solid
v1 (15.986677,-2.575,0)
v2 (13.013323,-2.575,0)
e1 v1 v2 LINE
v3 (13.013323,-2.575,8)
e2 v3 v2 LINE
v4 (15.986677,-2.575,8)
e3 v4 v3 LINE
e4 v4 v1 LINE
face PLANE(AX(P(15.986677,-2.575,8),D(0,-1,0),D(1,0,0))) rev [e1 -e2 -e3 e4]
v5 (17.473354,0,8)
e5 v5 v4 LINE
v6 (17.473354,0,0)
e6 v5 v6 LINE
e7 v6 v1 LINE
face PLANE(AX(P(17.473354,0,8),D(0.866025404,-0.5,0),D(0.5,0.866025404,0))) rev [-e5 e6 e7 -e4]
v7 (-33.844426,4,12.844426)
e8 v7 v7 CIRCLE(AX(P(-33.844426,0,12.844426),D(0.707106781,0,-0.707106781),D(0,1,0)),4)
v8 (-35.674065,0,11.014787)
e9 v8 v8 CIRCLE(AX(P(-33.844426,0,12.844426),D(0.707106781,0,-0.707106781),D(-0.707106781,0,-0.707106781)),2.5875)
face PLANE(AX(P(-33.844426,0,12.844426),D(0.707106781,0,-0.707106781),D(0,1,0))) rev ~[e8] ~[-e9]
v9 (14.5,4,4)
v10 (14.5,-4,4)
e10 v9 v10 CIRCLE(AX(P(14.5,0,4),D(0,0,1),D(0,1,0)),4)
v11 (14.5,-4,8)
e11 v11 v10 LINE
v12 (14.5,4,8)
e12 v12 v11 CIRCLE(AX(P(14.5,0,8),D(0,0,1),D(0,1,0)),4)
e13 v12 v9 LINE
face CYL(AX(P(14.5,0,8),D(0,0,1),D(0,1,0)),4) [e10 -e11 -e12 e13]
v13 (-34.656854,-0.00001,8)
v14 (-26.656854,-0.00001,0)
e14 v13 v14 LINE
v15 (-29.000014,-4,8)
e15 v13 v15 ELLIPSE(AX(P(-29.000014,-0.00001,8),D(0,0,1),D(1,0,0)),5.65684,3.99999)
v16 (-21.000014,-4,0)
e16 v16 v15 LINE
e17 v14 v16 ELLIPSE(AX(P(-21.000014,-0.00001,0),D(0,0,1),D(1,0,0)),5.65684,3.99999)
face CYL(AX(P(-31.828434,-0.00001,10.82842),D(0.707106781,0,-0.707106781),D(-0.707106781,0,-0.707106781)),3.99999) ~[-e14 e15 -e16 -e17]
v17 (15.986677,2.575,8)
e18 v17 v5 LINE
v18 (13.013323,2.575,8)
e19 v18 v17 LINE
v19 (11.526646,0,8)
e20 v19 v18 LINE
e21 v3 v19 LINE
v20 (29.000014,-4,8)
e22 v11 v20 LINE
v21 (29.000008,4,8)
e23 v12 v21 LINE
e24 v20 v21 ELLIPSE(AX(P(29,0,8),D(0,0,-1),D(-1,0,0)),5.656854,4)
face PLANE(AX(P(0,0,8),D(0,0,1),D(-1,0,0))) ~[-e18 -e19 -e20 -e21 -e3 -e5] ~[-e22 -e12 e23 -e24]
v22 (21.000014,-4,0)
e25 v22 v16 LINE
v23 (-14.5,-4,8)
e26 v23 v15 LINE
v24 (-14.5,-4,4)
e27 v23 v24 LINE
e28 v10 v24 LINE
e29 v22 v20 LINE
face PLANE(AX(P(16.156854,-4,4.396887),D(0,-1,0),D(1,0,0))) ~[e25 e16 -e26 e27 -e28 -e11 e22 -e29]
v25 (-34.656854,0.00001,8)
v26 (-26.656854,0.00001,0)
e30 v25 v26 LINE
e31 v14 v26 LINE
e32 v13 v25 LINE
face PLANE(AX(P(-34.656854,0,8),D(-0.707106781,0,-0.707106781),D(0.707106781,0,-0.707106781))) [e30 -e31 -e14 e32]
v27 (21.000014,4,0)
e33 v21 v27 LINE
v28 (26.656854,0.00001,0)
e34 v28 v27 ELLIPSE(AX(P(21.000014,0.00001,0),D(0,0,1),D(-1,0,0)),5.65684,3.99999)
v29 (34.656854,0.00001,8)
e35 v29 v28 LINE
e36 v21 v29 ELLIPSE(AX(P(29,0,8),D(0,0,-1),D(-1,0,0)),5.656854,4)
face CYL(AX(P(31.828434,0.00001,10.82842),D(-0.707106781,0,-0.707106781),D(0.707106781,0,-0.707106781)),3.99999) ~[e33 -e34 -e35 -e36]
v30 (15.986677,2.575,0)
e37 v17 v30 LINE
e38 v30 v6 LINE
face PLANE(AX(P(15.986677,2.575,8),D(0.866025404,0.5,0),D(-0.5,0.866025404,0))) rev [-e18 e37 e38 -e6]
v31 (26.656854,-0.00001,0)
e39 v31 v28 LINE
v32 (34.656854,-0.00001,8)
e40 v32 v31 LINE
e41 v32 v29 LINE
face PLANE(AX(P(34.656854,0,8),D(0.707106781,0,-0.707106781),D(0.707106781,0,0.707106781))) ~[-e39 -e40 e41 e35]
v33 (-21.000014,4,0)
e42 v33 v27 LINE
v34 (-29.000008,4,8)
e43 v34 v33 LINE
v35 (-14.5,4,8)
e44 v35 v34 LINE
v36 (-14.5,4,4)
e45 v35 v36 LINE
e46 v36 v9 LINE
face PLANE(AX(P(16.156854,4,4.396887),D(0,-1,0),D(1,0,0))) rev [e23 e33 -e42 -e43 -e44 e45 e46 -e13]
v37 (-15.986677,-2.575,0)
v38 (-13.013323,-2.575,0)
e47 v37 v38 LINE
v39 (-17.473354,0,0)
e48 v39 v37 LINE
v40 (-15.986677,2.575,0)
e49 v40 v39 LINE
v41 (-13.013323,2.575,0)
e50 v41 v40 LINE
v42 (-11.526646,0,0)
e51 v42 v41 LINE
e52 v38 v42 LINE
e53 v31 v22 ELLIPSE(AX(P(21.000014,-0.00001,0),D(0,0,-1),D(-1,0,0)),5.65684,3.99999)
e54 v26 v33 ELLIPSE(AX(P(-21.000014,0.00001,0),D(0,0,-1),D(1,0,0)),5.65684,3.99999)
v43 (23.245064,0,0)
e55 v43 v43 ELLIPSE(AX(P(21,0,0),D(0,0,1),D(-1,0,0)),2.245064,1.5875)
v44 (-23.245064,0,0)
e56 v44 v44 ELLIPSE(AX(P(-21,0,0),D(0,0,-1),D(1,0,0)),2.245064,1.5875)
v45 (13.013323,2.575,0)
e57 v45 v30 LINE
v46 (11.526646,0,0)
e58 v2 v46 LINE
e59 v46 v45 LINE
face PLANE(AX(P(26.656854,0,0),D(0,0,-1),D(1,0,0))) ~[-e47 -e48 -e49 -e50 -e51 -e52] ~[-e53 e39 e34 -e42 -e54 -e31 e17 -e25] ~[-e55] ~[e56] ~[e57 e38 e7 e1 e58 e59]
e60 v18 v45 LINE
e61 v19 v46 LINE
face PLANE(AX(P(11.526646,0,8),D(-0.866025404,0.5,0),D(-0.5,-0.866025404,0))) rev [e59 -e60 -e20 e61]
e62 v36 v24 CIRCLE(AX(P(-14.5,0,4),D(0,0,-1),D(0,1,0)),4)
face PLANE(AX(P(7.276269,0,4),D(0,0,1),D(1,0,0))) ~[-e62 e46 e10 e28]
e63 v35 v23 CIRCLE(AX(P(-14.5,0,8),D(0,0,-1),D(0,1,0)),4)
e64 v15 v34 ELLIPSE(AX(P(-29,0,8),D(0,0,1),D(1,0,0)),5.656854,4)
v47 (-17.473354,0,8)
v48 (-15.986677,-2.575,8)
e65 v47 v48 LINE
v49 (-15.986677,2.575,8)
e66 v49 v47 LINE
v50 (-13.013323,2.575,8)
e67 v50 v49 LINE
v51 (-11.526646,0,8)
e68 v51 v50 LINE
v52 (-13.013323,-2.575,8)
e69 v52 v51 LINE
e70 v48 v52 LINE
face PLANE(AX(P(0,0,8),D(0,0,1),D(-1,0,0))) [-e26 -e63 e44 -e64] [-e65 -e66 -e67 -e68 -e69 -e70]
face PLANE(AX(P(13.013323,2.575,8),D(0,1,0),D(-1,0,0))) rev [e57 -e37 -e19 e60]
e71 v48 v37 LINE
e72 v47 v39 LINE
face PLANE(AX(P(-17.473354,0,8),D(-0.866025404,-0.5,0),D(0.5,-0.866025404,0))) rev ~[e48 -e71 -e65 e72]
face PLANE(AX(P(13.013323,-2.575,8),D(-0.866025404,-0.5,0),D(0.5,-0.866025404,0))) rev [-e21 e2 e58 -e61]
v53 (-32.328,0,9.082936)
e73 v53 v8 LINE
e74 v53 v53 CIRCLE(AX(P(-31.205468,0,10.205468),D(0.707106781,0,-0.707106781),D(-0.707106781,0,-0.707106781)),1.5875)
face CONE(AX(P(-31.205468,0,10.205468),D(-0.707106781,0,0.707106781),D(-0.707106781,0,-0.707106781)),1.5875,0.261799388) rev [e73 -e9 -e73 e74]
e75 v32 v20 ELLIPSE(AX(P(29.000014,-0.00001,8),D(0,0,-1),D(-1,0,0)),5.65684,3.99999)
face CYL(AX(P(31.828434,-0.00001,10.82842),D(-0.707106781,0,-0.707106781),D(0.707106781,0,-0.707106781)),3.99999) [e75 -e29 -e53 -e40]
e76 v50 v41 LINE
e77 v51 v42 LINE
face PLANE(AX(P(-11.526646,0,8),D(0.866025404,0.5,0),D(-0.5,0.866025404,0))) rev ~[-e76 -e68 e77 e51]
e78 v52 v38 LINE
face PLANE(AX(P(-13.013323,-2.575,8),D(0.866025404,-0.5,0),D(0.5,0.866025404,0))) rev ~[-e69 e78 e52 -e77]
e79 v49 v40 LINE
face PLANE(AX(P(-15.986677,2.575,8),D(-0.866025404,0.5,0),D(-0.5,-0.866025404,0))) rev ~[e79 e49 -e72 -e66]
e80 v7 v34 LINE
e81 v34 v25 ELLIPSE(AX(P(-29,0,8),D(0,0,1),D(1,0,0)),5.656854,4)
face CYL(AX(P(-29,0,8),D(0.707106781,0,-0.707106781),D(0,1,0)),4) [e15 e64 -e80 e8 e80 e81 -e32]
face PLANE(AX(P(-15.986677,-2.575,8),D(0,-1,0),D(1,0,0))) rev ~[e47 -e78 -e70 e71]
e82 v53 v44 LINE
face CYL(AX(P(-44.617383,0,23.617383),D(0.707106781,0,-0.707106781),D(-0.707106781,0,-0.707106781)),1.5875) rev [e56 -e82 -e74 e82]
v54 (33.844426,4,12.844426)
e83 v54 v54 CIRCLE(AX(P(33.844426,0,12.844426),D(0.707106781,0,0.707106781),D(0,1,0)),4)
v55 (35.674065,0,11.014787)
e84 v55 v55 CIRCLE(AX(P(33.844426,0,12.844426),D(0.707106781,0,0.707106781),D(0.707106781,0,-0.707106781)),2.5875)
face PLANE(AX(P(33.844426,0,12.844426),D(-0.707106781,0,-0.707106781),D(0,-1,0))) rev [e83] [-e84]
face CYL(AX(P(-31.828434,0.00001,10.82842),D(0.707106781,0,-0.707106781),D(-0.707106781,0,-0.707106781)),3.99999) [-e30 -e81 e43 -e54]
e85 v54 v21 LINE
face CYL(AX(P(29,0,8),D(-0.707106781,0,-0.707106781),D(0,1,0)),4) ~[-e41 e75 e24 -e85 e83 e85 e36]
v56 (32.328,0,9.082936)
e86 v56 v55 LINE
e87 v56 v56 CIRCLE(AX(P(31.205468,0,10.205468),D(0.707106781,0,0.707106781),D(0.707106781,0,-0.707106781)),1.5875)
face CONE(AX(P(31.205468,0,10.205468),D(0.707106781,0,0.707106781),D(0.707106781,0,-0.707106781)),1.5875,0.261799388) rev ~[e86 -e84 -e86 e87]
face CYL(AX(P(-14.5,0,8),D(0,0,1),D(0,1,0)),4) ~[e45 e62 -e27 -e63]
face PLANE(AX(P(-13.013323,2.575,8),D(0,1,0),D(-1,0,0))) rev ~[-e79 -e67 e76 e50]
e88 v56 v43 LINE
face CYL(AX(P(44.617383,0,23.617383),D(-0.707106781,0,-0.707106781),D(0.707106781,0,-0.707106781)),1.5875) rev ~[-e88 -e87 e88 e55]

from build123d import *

# Parameters (mm, degrees)
F1_DEPTH  = 4
F2_R      = 3.99999
F4_DEPTH  = 8
F6_DEPTH  = 4
F9_R      = 4
F10_DEPTH = 6.851053331
F12_SIZE2 = 1
F12_SIZE  = 3.7320508076


# Not quite as in the source:
# - a fillet or chamfer is up to 0.001 mm smaller than in the source, because OpenCascade refuses the exact size


with BuildPart() as f1:
    # F0 (on Front) → F1 (new body, symmetric)
    with BuildSketch(Plane.XZ):
        Polygon((-26.6568542495, 0), (0, 0), (0, 8), (-34.6568542495, 8), align=None)
    extrude(amount=F1_DEPTH, both=True)

    # F2 (radius 4 in the source; OpenCascade refuses exactly that, so slightly less here)
    f2_edges = [f1.edges().sort_by_distance(p)[0] for p in [
        (-30.656854, 4, 4),
        (-30.656854, -4, 4),
    ]]
    fillet(f2_edges, radius=F2_R)

    # F3 (on face) → F4 (cut, through all)
    with BuildSketch(Plane.XY.offset(8)):
        Polygon((-11.5266461137, 0), (-13.0133230568, 2.575), (-15.9866769432, 2.575), (-17.4733538863, 0), (-15.9866769432, -2.575), (-13.0133230568, -2.575), align=None)
    extrude(amount=-F4_DEPTH, mode=Mode.SUBTRACT)

    # F5 (on face) → F6 (cut)
    with BuildSketch(Plane.XY.offset(8)):
        with BuildLine():
            ThreePointArc((-14.5, 4), (-10.5, 0), (-14.5, -4))
            Line((-14.5, -4), (0, -4))
            Line((0, -4), (0, 4))
            Line((0, 4), (-14.5, 4))
        make_face()
    extrude(amount=-F6_DEPTH, mode=Mode.SUBTRACT)

    # F9 (on line) → F10 (join, symmetric)
    with BuildSketch(Plane(origin=(-18.5, 0, 18.5), x_dir=(0, 1, 0), z_dir=(0.7071067812, 0, -0.7071067812))):
        with Locations((0, -14.8492424049)):
            Circle(F9_R)
    extrude(amount=F10_DEPTH, both=True)

    # F7 (on Front) → F11 (revolve, cut)
    with BuildSketch(Plane.XZ):
        Polygon((-11.4302859145, -11.8147781158), (-10.3077538993, -10.6922461007), (-44.6173825807, 23.6173825807), (-45.7399145958, 22.4948505656), align=None)
    revolve(axis=Axis((-27.46256824, 0, 6.46256824), (-0.7071067812, 0, 0.7071067812)), mode=Mode.SUBTRACT)

    # F12
    f12_edges = [f1.edges().sort_by_distance(p)[0] for p in [
        (-32.721894, 0, 13.966958),
    ]]
    f12_side = f1.faces().sort_by_distance((-25.685621, 0, 6.930685))[0]
    chamfer(f12_edges, length=F12_SIZE, length2=F12_SIZE2, reference=f12_side)

    # F13: F1 across face


with BuildPart() as f1_1:
    add(f1.part)
    add(f1.part.mirror(Plane(origin=(0, 0, 2), x_dir=(0, 1, 0), z_dir=(1, 0, 0))))


solid = f1_1.part
